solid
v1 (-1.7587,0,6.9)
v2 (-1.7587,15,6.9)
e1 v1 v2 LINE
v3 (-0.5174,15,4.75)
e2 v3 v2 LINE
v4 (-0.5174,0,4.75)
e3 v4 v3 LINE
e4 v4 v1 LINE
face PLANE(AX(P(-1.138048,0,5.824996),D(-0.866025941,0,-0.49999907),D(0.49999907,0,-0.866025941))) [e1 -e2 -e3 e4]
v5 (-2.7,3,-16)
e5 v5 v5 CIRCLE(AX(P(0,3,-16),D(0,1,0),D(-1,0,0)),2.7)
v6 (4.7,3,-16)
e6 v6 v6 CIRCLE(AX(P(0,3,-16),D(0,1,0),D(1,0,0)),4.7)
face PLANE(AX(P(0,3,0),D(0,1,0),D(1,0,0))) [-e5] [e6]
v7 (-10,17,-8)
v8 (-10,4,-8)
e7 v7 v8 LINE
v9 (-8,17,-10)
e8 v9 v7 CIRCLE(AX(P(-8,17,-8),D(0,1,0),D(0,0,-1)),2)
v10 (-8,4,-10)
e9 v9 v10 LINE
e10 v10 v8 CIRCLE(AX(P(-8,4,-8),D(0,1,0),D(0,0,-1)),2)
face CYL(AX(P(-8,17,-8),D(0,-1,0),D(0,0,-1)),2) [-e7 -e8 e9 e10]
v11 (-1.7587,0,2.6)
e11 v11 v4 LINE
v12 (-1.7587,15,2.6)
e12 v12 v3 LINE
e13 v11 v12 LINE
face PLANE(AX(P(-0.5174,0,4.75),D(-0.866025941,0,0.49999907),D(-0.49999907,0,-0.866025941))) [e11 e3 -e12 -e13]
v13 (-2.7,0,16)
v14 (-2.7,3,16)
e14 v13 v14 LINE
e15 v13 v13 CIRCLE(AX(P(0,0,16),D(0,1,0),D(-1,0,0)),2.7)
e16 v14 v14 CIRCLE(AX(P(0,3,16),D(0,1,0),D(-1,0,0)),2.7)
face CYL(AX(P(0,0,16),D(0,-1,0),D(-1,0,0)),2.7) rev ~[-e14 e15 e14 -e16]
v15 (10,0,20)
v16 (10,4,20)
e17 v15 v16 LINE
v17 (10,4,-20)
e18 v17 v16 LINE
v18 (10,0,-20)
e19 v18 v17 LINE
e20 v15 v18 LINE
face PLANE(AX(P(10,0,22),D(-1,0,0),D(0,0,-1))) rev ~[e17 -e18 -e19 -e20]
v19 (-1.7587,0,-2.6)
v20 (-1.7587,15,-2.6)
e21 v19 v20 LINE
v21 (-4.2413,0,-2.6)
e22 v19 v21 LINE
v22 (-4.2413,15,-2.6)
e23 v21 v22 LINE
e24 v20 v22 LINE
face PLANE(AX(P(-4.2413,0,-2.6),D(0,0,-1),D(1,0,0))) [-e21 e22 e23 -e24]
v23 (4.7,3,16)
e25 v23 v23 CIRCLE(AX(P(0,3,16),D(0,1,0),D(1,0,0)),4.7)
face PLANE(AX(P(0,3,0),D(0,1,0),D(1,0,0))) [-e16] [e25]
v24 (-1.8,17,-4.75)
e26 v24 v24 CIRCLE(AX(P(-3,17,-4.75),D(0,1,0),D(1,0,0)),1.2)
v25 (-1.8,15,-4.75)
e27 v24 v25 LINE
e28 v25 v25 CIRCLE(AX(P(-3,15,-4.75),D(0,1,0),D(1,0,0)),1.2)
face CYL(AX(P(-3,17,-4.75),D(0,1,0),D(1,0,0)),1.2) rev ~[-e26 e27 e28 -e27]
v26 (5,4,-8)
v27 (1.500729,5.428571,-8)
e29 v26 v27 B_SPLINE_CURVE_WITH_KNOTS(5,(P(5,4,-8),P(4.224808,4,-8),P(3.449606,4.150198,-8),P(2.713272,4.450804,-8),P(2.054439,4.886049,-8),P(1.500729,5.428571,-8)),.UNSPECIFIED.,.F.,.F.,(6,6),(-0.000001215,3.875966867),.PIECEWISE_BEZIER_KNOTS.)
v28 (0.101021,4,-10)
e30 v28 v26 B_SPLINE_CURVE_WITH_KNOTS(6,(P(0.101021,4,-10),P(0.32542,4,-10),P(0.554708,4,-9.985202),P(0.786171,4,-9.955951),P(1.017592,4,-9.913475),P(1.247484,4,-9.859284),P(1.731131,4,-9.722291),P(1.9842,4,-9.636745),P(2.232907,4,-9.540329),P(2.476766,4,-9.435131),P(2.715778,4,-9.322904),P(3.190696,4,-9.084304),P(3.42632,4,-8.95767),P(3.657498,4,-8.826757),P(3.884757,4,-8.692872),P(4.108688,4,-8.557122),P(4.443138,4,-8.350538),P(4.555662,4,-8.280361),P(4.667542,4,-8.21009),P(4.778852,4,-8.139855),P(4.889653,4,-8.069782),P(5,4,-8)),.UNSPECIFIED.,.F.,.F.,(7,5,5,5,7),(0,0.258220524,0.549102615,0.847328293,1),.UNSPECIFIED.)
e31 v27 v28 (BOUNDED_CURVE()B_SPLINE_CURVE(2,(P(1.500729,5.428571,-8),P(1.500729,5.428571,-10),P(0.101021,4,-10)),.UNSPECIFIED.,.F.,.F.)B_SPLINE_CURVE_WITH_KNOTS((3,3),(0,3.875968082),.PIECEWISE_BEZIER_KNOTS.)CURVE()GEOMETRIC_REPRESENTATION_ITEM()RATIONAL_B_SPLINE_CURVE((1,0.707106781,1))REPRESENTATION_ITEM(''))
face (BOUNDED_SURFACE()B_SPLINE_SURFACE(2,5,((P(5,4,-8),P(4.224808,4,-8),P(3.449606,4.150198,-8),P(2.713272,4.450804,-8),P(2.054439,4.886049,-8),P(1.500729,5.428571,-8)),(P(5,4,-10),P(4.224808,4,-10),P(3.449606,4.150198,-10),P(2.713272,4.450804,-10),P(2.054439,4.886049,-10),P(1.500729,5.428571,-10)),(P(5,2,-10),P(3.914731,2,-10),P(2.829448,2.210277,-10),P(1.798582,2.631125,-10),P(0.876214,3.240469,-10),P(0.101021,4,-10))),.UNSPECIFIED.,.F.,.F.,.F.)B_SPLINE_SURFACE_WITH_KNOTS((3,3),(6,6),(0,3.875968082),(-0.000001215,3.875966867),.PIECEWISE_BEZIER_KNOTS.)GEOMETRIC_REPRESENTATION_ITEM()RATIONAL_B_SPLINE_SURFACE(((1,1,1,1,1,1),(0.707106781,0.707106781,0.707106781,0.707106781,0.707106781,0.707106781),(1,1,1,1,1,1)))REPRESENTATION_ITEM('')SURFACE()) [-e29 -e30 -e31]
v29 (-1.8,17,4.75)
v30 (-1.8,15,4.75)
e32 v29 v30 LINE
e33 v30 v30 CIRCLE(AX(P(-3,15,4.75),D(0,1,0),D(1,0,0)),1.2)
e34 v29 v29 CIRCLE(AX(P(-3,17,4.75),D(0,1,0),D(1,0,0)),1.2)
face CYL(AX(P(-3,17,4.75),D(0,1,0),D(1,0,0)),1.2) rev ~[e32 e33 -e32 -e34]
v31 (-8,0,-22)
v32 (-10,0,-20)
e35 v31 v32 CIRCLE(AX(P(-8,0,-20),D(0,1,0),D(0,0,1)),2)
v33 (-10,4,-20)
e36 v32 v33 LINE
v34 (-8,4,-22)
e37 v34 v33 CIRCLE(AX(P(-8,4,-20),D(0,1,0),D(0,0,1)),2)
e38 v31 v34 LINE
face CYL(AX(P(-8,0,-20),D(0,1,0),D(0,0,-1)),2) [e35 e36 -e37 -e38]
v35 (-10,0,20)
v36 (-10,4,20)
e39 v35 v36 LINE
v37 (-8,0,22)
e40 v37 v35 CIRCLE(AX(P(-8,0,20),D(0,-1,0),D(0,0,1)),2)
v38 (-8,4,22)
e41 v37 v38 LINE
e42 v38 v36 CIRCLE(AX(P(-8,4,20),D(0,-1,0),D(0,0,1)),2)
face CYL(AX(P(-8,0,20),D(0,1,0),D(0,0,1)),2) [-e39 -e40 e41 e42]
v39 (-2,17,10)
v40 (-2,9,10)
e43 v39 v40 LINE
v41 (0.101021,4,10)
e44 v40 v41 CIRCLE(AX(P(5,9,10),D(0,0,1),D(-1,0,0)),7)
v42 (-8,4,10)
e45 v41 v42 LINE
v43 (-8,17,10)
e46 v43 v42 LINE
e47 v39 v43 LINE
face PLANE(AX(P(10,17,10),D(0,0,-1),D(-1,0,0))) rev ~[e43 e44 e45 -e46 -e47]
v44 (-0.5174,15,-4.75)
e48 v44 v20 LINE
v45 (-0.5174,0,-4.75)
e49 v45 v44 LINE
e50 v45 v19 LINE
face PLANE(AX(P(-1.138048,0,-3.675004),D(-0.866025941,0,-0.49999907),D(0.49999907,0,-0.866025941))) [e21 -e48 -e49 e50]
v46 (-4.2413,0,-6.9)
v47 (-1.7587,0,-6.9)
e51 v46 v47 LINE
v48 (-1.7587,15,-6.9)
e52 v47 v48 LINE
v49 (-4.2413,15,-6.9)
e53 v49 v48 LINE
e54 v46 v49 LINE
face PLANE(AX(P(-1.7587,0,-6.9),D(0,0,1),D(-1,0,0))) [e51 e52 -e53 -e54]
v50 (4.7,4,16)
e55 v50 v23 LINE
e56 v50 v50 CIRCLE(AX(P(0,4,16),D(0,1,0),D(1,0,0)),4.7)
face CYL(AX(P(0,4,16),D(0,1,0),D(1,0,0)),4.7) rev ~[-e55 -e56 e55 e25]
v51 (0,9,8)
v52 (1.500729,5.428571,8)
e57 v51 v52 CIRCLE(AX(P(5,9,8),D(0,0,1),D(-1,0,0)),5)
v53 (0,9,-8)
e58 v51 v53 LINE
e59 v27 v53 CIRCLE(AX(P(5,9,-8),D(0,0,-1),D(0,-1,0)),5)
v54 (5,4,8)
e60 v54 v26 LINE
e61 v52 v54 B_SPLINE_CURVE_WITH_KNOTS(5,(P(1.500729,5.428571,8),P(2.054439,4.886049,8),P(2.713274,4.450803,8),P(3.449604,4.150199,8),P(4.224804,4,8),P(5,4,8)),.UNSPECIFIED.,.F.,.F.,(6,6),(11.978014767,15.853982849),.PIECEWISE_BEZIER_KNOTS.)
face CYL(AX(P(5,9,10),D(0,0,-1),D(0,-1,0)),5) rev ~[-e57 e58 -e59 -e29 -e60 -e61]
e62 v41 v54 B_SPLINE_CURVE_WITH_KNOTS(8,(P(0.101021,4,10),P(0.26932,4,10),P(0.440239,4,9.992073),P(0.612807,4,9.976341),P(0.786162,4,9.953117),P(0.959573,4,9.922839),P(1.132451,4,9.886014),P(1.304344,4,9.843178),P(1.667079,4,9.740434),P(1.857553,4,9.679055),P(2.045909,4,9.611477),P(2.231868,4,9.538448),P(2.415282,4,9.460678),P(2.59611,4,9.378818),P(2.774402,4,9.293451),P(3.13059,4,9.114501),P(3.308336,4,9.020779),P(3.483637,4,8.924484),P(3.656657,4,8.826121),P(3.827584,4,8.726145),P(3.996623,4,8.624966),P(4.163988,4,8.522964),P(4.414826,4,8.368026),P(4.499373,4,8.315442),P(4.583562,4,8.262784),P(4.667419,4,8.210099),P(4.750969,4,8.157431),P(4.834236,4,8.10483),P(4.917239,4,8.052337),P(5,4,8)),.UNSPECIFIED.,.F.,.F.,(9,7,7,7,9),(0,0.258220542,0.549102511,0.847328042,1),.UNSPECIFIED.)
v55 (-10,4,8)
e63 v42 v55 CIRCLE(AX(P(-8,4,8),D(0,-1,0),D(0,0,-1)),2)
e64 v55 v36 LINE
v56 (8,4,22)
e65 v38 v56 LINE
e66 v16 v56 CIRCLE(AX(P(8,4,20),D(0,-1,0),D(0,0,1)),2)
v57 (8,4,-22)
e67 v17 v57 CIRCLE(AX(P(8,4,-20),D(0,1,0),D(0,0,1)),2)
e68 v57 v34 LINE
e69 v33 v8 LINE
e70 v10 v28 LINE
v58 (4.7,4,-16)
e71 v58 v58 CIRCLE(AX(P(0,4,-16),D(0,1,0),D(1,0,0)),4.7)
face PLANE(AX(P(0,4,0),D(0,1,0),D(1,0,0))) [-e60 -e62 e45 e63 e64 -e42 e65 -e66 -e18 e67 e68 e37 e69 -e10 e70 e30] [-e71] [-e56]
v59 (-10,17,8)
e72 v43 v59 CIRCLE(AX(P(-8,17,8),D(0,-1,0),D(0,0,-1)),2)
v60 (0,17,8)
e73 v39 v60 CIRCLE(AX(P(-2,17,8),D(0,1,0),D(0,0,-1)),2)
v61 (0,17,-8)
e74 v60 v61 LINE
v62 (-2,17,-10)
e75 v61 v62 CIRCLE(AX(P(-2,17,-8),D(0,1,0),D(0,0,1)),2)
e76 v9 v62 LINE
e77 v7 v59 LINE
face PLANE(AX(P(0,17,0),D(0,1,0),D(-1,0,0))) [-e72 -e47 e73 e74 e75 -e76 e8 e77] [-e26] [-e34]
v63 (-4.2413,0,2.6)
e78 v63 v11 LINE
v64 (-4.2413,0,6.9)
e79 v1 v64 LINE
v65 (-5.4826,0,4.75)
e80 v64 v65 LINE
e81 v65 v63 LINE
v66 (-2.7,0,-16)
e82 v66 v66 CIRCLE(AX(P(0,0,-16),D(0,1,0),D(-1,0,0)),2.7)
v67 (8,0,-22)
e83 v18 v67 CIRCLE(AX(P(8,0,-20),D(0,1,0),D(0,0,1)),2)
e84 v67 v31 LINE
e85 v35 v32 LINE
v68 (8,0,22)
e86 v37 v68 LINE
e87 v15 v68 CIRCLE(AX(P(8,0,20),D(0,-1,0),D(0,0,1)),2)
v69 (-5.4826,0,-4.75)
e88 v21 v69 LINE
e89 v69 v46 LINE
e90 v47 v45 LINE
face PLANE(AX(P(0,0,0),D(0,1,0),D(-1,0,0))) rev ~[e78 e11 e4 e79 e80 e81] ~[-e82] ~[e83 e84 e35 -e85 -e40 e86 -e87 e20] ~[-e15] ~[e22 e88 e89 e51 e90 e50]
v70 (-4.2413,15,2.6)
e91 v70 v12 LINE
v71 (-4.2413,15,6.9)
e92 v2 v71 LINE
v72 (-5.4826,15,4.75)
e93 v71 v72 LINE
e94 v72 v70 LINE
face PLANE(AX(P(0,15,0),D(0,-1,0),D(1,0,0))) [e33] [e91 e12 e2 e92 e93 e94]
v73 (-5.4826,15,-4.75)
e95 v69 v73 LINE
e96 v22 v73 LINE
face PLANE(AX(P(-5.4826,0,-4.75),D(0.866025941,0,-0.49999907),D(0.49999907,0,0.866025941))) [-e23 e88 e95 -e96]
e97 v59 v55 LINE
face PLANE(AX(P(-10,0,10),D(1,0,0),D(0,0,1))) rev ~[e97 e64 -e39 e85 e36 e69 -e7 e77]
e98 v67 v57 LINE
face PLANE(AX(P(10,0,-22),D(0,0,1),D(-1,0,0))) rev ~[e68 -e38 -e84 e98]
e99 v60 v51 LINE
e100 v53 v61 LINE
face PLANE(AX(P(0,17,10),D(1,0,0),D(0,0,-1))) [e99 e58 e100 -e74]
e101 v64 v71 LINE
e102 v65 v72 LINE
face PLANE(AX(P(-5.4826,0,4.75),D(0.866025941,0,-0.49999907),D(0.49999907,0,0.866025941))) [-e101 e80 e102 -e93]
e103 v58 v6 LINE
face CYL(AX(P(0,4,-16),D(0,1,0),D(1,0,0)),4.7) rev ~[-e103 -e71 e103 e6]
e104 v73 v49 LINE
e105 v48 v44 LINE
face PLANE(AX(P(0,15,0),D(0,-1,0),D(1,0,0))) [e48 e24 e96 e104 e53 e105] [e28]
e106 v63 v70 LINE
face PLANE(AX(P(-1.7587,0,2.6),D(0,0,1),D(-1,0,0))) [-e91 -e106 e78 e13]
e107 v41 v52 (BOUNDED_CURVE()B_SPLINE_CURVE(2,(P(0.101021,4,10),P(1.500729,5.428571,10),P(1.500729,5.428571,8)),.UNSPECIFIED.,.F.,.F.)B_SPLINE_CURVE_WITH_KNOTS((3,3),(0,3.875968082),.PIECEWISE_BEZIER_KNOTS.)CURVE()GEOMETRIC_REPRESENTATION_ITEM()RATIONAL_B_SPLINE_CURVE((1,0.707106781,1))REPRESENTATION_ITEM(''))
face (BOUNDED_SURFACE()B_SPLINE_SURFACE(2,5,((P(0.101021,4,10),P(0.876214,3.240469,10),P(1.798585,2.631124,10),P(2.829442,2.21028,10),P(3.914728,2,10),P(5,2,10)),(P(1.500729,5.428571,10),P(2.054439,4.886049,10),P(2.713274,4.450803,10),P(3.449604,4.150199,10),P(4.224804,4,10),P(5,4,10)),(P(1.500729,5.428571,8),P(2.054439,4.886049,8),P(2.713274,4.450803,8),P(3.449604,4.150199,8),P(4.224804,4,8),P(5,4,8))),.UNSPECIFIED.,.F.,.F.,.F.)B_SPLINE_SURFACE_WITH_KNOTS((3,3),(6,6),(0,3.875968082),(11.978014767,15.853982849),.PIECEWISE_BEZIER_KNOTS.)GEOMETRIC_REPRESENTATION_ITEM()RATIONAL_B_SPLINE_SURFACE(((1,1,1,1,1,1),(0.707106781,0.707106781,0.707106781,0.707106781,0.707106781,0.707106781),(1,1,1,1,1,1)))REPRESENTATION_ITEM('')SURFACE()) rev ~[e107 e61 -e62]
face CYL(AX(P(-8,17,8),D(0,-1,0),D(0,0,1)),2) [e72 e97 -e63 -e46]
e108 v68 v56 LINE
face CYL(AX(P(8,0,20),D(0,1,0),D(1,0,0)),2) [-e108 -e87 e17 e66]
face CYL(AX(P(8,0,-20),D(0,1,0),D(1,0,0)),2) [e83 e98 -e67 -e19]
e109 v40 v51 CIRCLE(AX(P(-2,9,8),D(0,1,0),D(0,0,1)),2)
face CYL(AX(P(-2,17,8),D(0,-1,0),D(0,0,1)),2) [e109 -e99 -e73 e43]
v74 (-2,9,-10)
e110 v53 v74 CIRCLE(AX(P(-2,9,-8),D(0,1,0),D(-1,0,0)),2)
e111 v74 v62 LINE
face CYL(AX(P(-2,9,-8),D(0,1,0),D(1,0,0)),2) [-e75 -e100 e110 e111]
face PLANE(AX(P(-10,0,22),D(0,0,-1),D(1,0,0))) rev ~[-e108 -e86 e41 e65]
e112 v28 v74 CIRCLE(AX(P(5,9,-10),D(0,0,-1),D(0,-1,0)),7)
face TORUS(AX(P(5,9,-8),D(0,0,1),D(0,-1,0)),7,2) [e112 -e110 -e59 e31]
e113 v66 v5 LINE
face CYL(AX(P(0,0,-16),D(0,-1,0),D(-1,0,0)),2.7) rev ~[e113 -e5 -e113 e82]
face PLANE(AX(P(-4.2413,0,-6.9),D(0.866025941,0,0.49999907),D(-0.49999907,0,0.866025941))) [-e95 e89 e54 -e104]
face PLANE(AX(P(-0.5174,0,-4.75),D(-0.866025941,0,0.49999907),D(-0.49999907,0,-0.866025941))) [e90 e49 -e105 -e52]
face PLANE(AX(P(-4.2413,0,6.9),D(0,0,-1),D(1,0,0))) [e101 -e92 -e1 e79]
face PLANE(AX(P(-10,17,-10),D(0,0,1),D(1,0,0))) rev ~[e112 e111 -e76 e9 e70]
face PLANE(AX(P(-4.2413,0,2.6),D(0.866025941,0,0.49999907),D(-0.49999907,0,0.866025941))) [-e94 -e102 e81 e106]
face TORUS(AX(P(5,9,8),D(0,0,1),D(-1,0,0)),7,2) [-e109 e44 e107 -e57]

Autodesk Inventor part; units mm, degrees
ref_plane "YZ Plane" through (0, 0, 0) normal (1, 0, 0) x (0, 1, 0)
ref_plane "XZ Plane" through (0, 0, 0) normal (0, 1, 0) x (-1, 0, 0)
ref_plane "XY Plane" through (0, 0, 0) normal (0, 0, 1) x (1, 0, 0)
sketch "Boceto1" plane through (0, 0, 0) normal (0, 1, 0) x (-1, 0, 0)
  line L0 (-10, 10) -> (10, 10)
  line L1 (10, 10) -> (10, -10)
  line L2 (10, -10) -> (-10, -10)
  line L3 (-10, -10) -> (-10, 10)
  line L4 (-10, 10) -> (10, -10) construction
  line L5 (10, 10) -> (-10, -10) construction
  line L6 (10, 22) -> (-10, 22)
  line L7 (-10, 22) -> (-10, -22)
  line L8 (-10, -22) -> (10, -22)
  line L9 (10, -22) -> (10, 22)
  circle A0 centre (0, 16) radius 2.7
  circle A1 centre (0, -16) radius 2.7
  point P0 (0, 0)
  dimension "d0" = 20
  dimension "d1" = 20
  dimension "d2" = 5.4
  dimension "d3" = 5.4
  dimension "d4" = 6
  dimension "d5" = 6
  dimension "d6" = 6
  dimension "d7" = 6
extrude "Extrusión1" add sketch "Boceto1" along normal blind 17
sketch "Boceto2" plane through (0, 17, 0) normal (0, 1, 0) x (1, 0, 0)
  circle A0 centre (-3, -4.75) radius 1.2
  circle A1 centre (-3, 4.75) radius 1.2
  line L0 (-10, 22) -> (-10, -22) projected
  point P0 (0, 0)
  dimension "d10" = 2.4
  dimension "d11" = 9.5
  dimension "d12" = 4.75
  dimension "d13" = 7
extrude "Extrusión2" cut sketch "Boceto2" against normal through all
sketch "Boceto3" plane through (0, 17, 0) normal (0, 1, 0) x (1, 0, 0)
  line L0 (-10, 22) -> (-10, -22) projected
  line L1 (10, -10) -> (-10, -10)
  line L2 (-10, -10) -> (-10, 10)
  line L3 (-10, 10) -> (10, 10)
  line L4 (10, 10) -> (10, -10)
  line L5 (10, -10) -> (-10, 10) construction
  line L6 (-10, -10) -> (10, 10) construction
  circle A0 centre (-3, 4.75) radius 1.2 projected
  circle A1 centre (-3, -4.75) radius 1.2 projected
  line L7 (10, -22) -> (10, 22) projected
  line L8 (10, 22) -> (-10, 22) projected
  line L9 (-10, 22) -> (-10, -22) projected
  line L10 (-10, -22) -> (10, -22) projected
  circle A2 centre (0, -16) radius 2.7 projected
  circle A3 centre (0, 16) radius 2.7 projected
  point P0 (0, 0)
  point P1 (-10, -22)
  point P2 (-10, -10)
  dimension "d16" = 20
extrude "Extrusión3" cut sketch "Boceto3" against normal blind 13 contours L8 L7 L3 L0 | L1 L7 L10 L0
sketch "Boceto4" plane through (0, 4, 0) normal (0, 1, 0) x (1, 0, 0)
  circle A0 centre (0, -16) radius 2.7 projected
  circle A1 centre (0, -16) radius 4.7
  circle A2 centre (0, 16) radius 2.7 projected
  circle A3 centre (0, 16) radius 4.7
  point P0 (0, 0)
  dimension "d19" = 9.4
extrude "Extrusión4" cut sketch "Boceto4" against normal blind 1
sketch "Boceto5" plane through (0, 17, 0) normal (0, 1, 0) x (1, 0, 0)
  line L0 (-10, -10) -> (10, -10) projected
  line L1 (10, 10) -> (-10, 10) projected
  line L2 (10, -10) -> (0, -10)
  line L3 (0, -10) -> (0, 10)
  line L4 (0, 10) -> (10, 10)
  line L5 (10, 10) -> (10, -10)
  point P0 (0, 0)
  point P1 (0, -10)
  dimension "d22" = 10
extrude "Extrusión5" cut sketch "Boceto5" against normal up to surface (13 mm away)
fillet "Empalme1" radius 2 4 edges at (10, 2, 22) (-10, 2, 22) (10, 2, -22) (-10, 2, -22)
fillet "Empalme2" radius 5 1 edges at (0, 4, 0)
fillet "Empalme3" radius 2 6 edges at (-10, 10.5, 10) (-10, 10.5, -10) (0, 13, 10) (0, 13, -10) (1.4645, 5.4645, -10) (1.4645, 5.4645, 10)
sketch "Boceto6" plane through (0, 0, 0) normal (0, -1, 0) x (1, 0, 0)
  circle A0 centre (-3, -4.75) radius 1.2 projected
  circle A1 centre (-3, -4.75) radius 2.15
  circle A2 centre (-3, 4.75) radius 1.2 projected
  circle A3 centre (-3, 4.75) radius 2.15
  line L0 (-5.4826, -4.75) -> (-4.2413, -2.6)
  line L1 (-4.2413, -2.6) -> (-1.7587, -2.6)
  line L2 (-1.7587, -2.6) -> (-0.5174, -4.75)
  line L3 (-0.5174, -4.75) -> (-1.7587, -6.9)
  line L4 (-1.7587, -6.9) -> (-4.2413, -6.9)
  line L5 (-4.2413, -6.9) -> (-5.4826, -4.75)
  line L6 (-5.4826, 4.75) -> (-4.2413, 6.9)
  line L7 (-4.2413, 6.9) -> (-1.7587, 6.9)
  line L8 (-1.7587, 6.9) -> (-0.5174, 4.75)
  line L9 (-0.5174, 4.75) -> (-1.7587, 2.6)
  line L10 (-1.7587, 2.6) -> (-4.2413, 2.6)
  line L11 (-4.2413, 2.6) -> (-5.4826, 4.75)
  point P0 (0, 0)
  dimension "d29" = 4.3
  dimension "d30" = 4.3
extrude "Extrusión6" cut sketch "Boceto6" against normal blind 15 contours A0 | A1 | A1 L2 L3 | A1 L1 L2 | L3 L4 A1 | A1 L0 L1 | L4 L5 A1 | A1 L5 L0 | A2 | A3 | A3 L8 L9 | A3 L7 L8 | L9 L10 A3 | A3 L6 L7 | L10 L11 A3 | A3 L11 L6
properties part number "soporteendstop"
